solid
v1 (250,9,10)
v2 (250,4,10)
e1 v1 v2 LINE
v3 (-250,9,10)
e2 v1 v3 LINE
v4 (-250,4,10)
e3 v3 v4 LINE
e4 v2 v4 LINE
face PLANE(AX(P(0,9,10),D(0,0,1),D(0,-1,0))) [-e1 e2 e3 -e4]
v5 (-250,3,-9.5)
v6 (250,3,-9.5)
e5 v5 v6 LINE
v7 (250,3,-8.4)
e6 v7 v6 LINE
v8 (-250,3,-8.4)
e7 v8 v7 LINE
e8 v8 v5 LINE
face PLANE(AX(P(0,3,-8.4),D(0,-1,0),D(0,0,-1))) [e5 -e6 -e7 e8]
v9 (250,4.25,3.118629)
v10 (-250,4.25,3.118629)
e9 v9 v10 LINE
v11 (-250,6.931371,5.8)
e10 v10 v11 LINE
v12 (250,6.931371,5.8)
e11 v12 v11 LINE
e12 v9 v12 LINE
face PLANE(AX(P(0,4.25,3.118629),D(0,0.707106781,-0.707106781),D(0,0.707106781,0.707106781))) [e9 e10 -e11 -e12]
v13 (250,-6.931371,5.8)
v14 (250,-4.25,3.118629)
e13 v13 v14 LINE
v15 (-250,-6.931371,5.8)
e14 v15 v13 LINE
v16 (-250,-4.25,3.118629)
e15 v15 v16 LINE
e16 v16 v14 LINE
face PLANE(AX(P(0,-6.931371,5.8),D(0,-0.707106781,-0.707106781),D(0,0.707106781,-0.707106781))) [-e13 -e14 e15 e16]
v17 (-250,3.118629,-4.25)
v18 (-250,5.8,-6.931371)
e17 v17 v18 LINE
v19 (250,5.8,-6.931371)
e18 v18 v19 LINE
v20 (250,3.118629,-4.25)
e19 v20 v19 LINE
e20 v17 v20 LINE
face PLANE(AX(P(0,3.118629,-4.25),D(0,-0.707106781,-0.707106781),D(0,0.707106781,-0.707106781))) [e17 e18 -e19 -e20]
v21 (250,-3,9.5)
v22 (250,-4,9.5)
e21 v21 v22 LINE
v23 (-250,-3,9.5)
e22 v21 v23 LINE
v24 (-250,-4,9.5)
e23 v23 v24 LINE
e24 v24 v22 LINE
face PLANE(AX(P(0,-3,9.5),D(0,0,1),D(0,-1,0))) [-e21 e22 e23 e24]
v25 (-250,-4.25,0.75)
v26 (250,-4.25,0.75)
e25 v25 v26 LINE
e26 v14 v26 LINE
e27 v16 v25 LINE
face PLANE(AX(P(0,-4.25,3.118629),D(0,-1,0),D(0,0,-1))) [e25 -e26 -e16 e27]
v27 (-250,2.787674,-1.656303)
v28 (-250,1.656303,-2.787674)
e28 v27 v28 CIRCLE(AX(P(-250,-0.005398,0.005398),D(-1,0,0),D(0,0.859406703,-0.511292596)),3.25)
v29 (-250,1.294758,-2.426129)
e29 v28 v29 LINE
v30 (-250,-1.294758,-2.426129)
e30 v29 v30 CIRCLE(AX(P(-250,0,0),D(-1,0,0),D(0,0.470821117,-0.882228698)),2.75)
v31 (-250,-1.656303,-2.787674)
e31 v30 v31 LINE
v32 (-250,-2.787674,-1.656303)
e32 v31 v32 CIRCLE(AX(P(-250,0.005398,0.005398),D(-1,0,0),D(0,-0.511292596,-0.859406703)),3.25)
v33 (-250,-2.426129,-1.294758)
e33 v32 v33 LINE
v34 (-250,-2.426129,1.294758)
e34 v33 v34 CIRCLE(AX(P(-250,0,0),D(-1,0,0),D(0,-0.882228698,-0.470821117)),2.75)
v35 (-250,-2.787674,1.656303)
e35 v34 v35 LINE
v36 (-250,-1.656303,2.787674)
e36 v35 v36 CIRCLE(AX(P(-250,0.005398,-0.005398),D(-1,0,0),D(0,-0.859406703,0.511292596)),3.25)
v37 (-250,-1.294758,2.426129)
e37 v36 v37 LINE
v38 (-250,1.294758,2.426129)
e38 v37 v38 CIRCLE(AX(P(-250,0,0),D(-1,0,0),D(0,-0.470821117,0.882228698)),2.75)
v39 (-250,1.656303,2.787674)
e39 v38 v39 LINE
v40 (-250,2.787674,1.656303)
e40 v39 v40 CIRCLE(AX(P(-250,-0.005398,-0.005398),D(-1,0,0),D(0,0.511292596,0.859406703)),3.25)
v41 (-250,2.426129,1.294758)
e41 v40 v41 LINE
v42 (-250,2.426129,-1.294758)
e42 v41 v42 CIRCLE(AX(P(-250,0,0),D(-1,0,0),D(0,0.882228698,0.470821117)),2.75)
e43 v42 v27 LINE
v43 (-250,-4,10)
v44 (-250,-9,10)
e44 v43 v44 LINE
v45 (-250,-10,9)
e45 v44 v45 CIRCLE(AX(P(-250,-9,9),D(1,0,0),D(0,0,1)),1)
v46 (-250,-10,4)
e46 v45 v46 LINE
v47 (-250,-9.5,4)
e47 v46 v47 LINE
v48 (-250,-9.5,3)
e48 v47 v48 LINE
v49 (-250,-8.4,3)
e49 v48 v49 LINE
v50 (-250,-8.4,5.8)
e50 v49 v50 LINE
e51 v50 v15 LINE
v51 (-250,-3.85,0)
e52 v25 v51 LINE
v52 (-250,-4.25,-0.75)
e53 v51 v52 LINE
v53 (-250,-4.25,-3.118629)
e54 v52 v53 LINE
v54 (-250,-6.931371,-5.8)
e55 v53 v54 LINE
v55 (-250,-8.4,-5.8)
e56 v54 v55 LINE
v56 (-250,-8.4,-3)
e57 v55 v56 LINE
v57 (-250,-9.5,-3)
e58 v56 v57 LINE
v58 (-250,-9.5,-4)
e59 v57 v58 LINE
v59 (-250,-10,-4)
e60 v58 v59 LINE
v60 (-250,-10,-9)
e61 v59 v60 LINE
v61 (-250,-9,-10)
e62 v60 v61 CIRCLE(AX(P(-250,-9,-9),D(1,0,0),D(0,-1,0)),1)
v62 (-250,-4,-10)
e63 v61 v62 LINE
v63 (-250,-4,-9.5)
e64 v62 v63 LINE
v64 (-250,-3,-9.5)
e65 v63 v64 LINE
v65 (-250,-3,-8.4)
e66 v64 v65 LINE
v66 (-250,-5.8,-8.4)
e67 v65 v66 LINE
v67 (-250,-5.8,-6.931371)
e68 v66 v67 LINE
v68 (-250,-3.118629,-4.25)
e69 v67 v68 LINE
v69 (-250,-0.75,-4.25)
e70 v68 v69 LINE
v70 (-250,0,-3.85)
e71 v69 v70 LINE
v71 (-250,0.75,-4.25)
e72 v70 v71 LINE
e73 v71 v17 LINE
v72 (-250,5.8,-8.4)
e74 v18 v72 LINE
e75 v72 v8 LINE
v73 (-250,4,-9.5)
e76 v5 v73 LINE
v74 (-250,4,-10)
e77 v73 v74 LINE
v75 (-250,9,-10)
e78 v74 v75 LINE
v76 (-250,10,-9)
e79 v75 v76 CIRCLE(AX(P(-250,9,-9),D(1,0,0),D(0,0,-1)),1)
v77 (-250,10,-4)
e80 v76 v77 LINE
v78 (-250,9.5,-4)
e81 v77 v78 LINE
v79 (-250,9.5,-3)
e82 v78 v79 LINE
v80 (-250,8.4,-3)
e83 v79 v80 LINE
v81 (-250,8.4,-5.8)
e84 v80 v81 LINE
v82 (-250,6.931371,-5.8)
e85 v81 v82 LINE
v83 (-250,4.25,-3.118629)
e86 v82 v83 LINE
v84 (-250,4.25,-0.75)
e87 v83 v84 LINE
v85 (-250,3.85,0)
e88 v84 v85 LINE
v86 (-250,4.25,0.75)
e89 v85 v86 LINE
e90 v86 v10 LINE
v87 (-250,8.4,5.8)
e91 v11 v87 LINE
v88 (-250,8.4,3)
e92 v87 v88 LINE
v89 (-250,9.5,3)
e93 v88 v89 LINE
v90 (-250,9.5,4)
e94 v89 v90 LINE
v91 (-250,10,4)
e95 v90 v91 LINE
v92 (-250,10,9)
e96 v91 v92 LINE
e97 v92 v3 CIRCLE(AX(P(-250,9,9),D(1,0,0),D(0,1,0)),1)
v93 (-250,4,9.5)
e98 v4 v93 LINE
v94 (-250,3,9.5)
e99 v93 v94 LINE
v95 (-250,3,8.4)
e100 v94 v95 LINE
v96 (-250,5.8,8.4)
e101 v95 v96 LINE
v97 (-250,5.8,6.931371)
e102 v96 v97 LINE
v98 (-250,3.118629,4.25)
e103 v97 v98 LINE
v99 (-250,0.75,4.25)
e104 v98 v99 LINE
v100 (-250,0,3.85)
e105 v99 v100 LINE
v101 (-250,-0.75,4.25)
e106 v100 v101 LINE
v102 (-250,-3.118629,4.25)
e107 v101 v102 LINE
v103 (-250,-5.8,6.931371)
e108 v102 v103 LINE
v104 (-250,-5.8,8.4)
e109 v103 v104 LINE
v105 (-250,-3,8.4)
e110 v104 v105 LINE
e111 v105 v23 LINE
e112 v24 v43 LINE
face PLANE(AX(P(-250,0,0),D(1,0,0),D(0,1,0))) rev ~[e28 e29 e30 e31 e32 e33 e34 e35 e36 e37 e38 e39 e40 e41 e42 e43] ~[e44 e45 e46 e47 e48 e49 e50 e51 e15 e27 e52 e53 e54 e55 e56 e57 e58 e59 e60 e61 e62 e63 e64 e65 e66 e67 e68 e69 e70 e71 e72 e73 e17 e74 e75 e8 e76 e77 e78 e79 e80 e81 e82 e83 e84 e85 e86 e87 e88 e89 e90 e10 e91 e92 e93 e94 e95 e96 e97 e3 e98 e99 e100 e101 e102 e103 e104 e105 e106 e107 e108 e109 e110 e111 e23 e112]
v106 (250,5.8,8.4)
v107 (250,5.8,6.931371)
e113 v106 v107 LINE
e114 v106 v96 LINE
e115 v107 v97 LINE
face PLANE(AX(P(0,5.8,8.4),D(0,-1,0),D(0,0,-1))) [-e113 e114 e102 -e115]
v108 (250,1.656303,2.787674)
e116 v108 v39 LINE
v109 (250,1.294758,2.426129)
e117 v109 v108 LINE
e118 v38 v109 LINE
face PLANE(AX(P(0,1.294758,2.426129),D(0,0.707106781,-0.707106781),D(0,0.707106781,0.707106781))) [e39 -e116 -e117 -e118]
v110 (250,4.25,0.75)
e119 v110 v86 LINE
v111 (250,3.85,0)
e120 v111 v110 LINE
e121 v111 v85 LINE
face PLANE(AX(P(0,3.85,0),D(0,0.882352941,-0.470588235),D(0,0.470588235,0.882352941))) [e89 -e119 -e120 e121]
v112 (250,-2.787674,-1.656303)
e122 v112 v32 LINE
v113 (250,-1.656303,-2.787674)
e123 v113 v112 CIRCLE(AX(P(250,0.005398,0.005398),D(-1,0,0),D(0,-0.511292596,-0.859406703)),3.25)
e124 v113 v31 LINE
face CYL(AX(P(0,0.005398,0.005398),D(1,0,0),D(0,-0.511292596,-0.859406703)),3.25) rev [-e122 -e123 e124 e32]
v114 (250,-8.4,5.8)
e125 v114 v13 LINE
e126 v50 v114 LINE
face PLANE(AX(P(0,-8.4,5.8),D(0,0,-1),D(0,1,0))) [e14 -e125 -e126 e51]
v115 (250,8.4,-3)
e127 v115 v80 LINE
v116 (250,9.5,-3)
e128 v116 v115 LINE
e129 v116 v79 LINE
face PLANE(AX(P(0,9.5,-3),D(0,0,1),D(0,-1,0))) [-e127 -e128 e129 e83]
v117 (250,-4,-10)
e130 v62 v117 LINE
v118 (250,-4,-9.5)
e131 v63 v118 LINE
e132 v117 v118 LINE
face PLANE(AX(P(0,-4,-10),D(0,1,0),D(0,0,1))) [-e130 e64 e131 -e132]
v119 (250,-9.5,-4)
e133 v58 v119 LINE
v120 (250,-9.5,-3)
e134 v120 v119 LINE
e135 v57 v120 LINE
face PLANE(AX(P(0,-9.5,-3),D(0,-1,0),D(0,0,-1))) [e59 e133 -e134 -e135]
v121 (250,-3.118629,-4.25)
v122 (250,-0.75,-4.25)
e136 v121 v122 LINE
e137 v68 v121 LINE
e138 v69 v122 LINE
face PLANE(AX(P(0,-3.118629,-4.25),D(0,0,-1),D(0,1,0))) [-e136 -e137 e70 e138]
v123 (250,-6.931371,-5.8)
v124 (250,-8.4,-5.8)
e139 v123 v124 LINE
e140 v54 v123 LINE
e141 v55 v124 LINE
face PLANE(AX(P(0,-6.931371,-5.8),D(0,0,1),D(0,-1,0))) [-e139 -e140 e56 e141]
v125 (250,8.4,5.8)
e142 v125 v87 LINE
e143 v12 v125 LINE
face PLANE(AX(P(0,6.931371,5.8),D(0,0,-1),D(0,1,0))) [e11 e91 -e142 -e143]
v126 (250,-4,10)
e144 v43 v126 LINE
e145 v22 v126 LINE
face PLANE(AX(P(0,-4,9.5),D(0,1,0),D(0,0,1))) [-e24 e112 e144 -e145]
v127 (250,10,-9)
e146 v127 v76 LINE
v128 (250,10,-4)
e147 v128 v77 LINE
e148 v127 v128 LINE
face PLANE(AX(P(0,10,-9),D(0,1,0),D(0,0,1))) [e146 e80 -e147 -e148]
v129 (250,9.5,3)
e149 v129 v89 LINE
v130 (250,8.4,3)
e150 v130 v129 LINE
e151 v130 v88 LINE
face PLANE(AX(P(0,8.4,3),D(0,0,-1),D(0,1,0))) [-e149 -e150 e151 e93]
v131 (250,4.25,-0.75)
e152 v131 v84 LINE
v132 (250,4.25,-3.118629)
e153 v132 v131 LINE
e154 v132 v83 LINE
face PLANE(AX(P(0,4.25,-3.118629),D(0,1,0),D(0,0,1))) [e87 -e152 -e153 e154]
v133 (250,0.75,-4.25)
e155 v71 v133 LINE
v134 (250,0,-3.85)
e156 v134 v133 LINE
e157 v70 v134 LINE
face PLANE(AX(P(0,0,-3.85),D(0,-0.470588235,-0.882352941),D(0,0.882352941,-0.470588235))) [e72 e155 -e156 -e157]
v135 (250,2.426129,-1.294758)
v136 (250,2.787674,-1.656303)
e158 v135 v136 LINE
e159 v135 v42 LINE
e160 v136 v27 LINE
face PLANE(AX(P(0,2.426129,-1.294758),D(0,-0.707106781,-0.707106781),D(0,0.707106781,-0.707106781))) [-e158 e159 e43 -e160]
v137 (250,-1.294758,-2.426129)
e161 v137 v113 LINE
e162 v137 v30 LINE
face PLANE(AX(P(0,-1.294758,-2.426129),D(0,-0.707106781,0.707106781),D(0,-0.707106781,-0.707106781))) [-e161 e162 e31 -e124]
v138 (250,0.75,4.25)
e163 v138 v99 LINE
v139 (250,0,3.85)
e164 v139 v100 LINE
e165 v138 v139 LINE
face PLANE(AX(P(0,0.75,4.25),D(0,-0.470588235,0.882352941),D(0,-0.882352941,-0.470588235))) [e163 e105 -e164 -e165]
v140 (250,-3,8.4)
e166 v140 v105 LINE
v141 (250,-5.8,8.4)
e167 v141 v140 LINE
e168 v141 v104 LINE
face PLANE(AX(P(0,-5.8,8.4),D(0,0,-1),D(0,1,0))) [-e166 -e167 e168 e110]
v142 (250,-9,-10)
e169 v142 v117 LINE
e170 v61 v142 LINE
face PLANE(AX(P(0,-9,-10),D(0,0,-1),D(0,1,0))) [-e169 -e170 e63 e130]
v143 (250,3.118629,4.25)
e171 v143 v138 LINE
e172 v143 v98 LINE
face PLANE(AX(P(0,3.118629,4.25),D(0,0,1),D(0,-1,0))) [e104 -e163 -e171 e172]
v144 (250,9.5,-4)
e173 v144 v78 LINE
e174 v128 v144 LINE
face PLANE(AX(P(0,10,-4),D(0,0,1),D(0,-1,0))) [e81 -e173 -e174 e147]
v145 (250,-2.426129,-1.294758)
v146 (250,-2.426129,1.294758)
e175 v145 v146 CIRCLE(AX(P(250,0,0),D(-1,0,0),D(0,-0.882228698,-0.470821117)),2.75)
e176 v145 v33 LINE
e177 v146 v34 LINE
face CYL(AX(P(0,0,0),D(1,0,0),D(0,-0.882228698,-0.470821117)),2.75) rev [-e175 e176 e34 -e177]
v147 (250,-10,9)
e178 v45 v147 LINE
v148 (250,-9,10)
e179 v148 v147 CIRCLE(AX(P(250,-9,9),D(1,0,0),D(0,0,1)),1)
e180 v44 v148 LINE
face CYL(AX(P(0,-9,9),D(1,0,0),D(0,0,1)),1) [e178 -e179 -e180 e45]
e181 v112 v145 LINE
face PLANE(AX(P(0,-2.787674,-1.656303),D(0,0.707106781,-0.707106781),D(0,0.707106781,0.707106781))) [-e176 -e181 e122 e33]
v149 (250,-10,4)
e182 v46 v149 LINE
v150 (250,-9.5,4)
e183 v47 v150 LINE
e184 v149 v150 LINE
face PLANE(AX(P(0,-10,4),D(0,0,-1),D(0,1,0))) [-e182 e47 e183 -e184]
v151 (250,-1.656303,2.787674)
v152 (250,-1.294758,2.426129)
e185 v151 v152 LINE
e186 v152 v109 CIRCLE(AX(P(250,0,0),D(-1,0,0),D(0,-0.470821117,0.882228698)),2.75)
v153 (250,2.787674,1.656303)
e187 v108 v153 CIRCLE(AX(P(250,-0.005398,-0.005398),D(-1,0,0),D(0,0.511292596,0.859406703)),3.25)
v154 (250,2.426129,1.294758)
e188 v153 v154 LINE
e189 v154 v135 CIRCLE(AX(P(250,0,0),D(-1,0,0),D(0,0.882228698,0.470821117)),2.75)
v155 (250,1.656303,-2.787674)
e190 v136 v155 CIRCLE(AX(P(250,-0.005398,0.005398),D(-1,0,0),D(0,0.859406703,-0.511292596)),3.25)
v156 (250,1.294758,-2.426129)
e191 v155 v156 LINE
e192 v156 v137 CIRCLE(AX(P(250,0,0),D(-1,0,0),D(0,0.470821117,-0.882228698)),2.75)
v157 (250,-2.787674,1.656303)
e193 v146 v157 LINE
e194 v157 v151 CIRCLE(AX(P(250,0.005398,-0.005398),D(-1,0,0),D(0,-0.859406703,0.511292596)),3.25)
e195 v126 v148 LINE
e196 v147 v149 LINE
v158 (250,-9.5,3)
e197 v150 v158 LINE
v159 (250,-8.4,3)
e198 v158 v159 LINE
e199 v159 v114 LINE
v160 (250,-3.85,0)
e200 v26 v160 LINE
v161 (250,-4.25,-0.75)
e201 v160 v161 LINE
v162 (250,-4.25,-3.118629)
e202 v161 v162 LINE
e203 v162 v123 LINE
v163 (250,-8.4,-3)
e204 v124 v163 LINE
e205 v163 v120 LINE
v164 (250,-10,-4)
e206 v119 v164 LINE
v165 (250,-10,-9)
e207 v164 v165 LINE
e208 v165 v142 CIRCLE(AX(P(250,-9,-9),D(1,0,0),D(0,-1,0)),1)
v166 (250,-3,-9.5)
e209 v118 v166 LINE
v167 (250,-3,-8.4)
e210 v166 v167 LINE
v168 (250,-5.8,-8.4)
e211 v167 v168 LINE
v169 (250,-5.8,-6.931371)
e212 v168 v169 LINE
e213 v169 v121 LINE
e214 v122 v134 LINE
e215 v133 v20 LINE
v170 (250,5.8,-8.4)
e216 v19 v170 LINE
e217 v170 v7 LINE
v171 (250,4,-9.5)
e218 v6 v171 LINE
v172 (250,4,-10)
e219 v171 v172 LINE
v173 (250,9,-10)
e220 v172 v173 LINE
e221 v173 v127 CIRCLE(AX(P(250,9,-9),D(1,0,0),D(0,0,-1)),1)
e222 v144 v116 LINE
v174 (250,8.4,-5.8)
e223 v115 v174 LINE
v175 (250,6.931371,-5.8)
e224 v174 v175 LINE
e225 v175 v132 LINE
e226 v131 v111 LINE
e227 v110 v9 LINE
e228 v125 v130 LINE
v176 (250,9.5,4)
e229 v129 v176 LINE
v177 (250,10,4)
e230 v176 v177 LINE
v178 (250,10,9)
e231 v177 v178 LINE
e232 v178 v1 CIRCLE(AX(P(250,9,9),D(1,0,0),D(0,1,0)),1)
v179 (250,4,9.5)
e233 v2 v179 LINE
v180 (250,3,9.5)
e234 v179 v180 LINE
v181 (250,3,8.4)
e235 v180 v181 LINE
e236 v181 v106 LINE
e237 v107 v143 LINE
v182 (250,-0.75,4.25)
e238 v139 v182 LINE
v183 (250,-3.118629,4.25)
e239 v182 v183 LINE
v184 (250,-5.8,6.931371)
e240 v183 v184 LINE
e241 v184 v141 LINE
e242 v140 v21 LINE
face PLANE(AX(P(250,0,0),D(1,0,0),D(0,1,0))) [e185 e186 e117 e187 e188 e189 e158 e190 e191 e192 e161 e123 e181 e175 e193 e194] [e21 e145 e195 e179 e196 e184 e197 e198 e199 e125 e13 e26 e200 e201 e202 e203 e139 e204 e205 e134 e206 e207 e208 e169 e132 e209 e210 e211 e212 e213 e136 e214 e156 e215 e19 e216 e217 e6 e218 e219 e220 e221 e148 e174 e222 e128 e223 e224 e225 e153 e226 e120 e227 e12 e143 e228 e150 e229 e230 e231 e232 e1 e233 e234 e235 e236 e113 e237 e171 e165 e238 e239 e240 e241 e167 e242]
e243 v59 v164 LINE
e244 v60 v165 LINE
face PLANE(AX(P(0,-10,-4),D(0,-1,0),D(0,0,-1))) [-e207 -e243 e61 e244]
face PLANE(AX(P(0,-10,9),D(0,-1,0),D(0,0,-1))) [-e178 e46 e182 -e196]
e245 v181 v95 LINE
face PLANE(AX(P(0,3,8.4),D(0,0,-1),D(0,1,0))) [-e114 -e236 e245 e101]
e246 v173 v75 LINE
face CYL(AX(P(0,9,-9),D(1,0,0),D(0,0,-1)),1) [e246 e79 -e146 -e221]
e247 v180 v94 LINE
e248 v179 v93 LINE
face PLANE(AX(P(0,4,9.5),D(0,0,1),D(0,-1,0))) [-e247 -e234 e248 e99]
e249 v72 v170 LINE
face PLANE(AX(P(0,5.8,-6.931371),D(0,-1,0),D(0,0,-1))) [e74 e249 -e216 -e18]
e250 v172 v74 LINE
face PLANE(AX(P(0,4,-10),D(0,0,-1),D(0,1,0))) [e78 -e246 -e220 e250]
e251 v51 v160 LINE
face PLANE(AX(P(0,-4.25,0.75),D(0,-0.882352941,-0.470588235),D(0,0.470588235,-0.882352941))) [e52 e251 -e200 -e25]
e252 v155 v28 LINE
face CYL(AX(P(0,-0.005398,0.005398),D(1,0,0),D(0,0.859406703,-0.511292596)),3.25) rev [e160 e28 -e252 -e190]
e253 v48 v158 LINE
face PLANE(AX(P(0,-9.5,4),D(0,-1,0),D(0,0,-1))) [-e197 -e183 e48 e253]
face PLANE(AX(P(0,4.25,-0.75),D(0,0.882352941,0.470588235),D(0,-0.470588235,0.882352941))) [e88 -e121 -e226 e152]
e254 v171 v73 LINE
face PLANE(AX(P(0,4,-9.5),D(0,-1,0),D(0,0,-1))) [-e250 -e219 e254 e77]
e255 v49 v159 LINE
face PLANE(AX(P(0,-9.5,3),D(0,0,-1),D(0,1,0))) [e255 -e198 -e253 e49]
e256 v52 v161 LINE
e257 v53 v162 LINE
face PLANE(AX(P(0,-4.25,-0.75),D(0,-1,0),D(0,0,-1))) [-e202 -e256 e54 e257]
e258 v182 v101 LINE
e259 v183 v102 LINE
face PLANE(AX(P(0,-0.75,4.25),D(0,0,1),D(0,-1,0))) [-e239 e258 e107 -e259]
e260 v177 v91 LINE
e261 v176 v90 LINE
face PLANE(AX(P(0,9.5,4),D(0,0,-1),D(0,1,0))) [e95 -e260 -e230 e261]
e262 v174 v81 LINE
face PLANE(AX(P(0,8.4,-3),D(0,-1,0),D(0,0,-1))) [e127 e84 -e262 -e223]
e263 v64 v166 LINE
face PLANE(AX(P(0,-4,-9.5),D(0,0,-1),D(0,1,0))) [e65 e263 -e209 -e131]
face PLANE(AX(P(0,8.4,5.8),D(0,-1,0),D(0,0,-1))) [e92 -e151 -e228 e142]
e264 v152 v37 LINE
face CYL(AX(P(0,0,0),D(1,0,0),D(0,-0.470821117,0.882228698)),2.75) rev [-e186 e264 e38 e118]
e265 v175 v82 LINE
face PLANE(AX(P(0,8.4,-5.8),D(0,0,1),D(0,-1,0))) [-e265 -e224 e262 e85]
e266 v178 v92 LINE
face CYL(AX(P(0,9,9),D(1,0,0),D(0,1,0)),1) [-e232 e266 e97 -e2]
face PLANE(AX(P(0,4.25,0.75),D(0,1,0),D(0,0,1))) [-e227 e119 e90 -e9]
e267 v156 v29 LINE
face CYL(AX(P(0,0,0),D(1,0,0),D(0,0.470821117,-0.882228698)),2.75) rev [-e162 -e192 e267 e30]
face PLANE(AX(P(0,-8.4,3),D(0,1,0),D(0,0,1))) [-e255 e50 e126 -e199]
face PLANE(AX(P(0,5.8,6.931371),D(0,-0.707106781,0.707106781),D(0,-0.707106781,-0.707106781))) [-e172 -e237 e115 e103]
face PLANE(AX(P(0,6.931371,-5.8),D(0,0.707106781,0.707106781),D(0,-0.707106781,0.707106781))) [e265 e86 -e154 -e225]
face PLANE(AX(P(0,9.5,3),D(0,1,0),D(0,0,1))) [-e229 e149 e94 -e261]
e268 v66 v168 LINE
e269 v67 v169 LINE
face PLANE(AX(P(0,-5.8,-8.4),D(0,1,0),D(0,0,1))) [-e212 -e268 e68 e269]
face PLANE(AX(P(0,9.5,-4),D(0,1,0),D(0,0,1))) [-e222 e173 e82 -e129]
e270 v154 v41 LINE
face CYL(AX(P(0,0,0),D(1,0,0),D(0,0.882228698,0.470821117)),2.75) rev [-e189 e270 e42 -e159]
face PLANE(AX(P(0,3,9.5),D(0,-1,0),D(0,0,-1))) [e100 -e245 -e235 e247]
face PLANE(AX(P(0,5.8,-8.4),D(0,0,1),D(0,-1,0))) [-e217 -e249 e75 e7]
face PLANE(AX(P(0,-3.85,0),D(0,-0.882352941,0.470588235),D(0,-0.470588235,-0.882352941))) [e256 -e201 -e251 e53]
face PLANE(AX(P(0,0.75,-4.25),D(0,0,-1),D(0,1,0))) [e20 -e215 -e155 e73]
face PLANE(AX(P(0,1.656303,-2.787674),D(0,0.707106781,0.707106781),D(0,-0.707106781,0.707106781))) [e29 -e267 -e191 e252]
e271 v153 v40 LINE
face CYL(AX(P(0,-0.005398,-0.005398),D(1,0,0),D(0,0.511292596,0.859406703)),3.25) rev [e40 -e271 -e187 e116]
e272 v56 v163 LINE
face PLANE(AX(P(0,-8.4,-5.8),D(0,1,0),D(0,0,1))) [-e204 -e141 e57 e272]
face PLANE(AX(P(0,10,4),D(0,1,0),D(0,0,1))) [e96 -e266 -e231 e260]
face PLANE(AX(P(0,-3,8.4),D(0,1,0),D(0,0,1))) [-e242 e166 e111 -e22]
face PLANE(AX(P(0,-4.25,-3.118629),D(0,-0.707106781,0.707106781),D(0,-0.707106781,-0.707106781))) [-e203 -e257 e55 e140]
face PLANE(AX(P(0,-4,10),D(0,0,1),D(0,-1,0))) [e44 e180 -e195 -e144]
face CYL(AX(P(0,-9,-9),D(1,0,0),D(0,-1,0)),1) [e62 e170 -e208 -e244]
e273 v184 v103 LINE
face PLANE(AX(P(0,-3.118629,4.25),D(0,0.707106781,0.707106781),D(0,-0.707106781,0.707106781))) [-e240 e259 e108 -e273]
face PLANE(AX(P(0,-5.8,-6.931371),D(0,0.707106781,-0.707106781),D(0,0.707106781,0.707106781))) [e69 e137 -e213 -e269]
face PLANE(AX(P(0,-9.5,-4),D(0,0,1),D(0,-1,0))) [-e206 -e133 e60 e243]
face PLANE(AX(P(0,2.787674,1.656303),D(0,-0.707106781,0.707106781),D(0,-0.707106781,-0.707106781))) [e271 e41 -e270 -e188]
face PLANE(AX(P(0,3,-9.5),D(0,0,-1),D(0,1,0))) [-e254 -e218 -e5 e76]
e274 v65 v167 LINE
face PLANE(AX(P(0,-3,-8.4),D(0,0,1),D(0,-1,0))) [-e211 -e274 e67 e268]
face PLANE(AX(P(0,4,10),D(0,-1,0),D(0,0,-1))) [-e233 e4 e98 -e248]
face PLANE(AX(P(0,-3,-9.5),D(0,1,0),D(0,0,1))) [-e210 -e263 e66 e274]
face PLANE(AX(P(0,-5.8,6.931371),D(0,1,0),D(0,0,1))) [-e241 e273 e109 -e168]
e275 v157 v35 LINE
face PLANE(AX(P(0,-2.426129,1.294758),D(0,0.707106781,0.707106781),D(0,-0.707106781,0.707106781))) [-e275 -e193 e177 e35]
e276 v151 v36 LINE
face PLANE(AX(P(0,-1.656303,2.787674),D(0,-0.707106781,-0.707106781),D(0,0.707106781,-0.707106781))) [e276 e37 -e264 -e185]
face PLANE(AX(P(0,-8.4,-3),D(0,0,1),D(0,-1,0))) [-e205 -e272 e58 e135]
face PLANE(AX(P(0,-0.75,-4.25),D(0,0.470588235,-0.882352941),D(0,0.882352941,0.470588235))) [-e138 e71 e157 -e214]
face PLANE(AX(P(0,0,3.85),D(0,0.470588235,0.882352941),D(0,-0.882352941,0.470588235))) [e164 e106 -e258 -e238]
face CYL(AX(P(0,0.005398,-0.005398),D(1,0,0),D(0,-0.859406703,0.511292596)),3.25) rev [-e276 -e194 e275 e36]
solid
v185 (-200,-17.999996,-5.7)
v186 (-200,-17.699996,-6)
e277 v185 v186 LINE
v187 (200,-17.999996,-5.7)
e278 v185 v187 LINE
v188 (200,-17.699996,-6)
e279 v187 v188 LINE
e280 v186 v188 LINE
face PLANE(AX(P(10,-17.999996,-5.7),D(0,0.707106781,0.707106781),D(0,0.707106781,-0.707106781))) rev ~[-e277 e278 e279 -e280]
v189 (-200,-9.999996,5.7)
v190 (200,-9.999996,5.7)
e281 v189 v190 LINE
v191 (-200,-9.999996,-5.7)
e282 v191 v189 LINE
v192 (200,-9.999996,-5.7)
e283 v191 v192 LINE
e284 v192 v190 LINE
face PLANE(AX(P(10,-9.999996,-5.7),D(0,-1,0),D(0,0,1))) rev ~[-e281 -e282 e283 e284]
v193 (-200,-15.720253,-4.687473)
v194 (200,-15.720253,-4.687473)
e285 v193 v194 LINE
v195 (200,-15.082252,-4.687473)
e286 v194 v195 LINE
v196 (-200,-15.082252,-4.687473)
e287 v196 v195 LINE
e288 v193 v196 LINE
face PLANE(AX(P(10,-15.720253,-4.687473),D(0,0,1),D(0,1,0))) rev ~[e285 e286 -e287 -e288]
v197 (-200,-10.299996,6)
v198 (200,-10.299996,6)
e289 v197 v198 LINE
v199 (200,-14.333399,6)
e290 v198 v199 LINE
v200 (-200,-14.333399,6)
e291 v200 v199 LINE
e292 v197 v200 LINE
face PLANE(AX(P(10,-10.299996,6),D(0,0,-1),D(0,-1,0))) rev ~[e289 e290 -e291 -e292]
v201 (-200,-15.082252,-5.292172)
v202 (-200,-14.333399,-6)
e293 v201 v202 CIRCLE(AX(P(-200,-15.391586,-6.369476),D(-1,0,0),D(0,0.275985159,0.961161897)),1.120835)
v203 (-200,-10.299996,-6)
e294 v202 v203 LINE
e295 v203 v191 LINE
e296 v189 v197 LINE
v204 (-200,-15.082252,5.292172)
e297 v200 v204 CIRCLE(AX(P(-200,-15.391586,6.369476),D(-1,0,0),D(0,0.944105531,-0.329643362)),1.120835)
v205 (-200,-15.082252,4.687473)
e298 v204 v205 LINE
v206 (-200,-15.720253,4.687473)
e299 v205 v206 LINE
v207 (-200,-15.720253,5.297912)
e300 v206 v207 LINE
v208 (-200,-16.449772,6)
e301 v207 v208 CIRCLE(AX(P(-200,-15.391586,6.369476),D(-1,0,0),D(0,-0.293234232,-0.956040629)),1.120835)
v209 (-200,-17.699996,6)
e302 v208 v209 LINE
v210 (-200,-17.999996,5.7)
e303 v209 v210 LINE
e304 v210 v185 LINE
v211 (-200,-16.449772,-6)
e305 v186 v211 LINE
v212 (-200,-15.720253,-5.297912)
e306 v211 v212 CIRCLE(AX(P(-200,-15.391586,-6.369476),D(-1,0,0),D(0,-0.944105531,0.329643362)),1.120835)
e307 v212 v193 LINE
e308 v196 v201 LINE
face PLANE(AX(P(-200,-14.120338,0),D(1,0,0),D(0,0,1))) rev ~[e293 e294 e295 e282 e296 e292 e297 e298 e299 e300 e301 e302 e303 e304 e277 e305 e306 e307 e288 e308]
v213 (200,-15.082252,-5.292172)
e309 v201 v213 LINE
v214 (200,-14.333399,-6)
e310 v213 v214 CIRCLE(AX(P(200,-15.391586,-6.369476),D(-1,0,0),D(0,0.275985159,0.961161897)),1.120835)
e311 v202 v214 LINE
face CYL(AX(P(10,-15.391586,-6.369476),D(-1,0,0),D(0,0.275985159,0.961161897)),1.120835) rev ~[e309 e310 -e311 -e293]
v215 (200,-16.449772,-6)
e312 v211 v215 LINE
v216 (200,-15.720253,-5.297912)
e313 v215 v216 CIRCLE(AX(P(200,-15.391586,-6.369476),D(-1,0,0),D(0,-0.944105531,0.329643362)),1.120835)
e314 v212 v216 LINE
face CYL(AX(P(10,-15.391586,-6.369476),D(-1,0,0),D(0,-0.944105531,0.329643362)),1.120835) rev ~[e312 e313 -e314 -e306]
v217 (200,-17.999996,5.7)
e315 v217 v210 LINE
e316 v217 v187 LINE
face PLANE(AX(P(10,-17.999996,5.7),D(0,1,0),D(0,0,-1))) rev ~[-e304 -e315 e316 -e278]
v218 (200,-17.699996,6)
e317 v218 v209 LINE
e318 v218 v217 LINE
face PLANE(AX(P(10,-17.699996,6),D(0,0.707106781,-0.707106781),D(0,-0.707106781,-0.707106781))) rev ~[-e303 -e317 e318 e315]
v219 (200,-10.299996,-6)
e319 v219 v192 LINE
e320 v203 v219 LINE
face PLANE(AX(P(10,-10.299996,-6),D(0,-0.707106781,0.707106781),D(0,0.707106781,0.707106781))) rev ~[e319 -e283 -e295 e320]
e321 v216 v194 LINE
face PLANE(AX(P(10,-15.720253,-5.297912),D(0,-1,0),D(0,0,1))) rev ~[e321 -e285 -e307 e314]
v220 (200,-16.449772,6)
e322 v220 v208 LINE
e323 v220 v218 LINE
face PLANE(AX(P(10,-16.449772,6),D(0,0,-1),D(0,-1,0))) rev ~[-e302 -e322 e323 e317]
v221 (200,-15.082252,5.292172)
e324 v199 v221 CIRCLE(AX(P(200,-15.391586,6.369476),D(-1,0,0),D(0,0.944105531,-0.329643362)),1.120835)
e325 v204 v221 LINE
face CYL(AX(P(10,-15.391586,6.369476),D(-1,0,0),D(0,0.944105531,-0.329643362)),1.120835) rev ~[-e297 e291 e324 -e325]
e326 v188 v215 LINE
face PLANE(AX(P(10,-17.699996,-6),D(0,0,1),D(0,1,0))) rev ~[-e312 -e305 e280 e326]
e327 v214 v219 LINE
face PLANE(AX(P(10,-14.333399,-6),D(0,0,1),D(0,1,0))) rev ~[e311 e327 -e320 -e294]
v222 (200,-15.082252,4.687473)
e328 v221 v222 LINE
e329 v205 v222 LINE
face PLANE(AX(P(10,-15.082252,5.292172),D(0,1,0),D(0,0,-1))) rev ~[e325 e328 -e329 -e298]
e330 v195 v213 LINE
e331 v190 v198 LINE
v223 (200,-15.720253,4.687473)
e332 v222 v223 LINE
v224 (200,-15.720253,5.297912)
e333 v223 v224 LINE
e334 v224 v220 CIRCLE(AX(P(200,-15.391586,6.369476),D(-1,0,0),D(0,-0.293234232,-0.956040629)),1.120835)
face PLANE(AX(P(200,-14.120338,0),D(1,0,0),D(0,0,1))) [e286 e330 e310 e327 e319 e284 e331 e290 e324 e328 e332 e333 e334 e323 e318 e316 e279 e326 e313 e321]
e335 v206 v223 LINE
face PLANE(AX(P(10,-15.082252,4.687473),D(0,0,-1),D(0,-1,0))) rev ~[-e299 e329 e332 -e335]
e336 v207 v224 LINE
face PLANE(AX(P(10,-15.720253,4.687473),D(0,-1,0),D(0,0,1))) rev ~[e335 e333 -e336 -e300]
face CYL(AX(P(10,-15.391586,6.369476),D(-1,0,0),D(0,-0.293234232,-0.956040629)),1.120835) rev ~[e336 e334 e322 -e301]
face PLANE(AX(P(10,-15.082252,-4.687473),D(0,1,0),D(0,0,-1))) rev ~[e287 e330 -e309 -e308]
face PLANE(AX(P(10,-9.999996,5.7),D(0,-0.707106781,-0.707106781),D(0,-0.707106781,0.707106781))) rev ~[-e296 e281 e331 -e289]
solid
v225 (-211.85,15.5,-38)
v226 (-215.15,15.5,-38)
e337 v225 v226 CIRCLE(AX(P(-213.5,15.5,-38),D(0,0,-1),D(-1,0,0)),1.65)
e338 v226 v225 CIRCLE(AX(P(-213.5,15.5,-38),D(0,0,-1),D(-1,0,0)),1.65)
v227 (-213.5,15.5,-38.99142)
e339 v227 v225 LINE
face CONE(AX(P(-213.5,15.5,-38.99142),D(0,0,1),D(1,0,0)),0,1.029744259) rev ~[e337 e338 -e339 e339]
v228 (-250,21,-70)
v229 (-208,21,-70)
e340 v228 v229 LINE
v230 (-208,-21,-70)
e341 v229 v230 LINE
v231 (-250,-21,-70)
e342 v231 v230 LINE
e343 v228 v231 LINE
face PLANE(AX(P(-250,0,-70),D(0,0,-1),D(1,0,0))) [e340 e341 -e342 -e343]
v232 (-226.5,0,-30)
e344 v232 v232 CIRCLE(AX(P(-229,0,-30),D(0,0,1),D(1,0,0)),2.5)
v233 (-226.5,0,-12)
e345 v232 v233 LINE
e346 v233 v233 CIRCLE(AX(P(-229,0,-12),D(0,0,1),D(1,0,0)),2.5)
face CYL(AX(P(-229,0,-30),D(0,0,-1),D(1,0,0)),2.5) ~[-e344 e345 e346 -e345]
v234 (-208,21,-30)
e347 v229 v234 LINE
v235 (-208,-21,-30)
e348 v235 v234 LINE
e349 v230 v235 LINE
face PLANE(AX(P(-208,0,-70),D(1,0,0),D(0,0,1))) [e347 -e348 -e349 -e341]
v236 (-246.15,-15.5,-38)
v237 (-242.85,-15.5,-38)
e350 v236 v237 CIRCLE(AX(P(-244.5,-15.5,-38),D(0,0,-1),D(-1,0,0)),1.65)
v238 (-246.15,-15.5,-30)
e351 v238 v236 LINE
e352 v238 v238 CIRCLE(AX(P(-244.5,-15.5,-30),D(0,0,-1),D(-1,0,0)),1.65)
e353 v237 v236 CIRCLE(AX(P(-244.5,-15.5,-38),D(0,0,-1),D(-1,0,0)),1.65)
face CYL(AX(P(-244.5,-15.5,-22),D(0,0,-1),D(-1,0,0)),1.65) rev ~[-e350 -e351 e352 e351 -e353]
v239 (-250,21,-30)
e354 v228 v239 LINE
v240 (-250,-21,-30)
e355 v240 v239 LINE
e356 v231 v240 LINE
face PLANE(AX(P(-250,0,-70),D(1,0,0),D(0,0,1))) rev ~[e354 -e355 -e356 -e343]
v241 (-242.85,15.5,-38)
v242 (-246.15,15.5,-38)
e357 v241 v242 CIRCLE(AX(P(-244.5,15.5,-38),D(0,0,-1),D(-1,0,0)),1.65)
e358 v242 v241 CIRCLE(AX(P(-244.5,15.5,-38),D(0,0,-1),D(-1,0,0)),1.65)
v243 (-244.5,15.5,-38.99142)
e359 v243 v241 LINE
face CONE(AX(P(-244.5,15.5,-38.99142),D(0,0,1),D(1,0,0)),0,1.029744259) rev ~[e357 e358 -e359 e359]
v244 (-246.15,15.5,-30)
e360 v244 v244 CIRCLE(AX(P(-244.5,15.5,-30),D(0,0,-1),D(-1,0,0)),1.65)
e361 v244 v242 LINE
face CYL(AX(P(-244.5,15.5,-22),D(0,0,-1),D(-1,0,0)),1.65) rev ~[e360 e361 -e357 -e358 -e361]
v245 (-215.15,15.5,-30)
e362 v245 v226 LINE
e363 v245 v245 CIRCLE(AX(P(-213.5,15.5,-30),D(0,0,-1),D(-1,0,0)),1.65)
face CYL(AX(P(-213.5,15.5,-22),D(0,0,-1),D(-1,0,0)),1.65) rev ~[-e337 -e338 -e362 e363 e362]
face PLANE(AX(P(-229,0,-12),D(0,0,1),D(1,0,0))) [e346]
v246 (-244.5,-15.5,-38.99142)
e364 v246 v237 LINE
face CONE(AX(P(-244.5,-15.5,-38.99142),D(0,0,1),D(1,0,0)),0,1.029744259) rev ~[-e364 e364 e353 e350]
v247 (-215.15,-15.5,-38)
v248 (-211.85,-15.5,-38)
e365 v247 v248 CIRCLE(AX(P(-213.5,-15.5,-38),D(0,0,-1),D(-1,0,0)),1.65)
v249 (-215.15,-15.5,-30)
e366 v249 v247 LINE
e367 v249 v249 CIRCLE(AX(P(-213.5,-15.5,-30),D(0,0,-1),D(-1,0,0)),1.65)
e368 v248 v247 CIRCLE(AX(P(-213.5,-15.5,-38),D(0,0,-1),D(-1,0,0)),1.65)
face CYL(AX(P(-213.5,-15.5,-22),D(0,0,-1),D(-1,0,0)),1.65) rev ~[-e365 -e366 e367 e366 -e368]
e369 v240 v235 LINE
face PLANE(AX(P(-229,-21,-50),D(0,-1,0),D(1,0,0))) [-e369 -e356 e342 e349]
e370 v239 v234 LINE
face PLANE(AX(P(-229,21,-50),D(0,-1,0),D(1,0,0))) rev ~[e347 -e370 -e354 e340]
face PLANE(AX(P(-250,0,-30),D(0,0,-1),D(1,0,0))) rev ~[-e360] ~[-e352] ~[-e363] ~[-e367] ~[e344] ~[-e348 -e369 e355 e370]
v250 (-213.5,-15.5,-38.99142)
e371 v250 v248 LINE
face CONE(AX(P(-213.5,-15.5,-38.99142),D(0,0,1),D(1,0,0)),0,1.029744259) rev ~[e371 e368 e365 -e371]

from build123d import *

# Parameters (mm, degrees)
F1_DEPTH       = 250
F1_DEPTH_BACK  = 250
F3_DEPTH       = 10
F3_DEPTH_BACK  = 10
F5_ANGLE       = 90
F7_DEPTH       = 190
F8_DEPTH       = 190
F9_W           = 42
F9_H           = 40
F10_DEPTH      = 21
F10_DEPTH_BACK = 21
F11_R          = 2.5
F12_DEPTH      = 18
F13_D          = 3.3
F13_DEPTH      = 8
F13_TIP        = 0.9914200214


with BuildPart() as f1:
    # F0 (on Right) → F1 (new body, two sides)
    with BuildSketch(Plane.YZ) as f1_sk:
        with BuildLine():
            Line((-3, 9.5), (-4, 9.5))
            Line((-4, 9.5), (-4, 10))
            Line((-4, 10), (-9, 10))
            ThreePointArc((-9, 10), (-9.7071067812, 9.7071067812), (-10, 9))
            Line((-10, 9), (-10, 4))
            Line((-10, 4), (-9.5, 4))
            Line((-9.5, 4), (-9.5, 3))
            Line((-9.5, 3), (-8.4, 3))
            Line((-8.4, 3), (-8.4, 5.8))
            Line((-8.4, 5.8), (-6.9313708499, 5.8))
            Line((-6.9313708499, 5.8), (-4.25, 3.1186291501))
            Line((-4.25, 3.1186291501), (-4.25, 0.75))
            Line((-4.25, 0.75), (-3.85, 0))
            Line((-3.85, 0), (-4.25, -0.75))
            Line((-4.25, -0.75), (-4.25, -3.1186291501))
            Line((-4.25, -3.1186291501), (-6.9313708499, -5.8))
            Line((-6.9313708499, -5.8), (-8.4, -5.8))
            Line((-8.4, -5.8), (-8.4, -3))
            Line((-8.4, -3), (-9.5, -3))
            Line((-9.5, -3), (-9.5, -4))
            Line((-9.5, -4), (-10, -4))
            Line((-10, -4), (-10, -9))
            ThreePointArc((-10, -9), (-9.7071067812, -9.7071067812), (-9, -10))
            Line((-9, -10), (-4, -10))
            Line((-4, -10), (-4, -9.5))
            Line((-4, -9.5), (-3, -9.5))
            Line((-3, -9.5), (-3, -8.4))
            Line((-3, -8.4), (-5.8, -8.4))
            Line((-5.8, -8.4), (-5.8, -6.9313708499))
            Line((-5.8, -6.9313708499), (-3.1186291501, -4.25))
            Line((-3.1186291501, -4.25), (-0.75, -4.25))
            Line((-0.75, -4.25), (0, -3.85))
            Line((0, -3.85), (0.75, -4.25))
            Line((0.75, -4.25), (3.1186291501, -4.25))
            Line((3.1186291501, -4.25), (5.8, -6.9313708499))
            Line((5.8, -6.9313708499), (5.8, -8.4))
            Line((5.8, -8.4), (3, -8.4))
            Line((3, -8.4), (3, -9.5))
            Line((3, -9.5), (4, -9.5))
            Line((4, -9.5), (4, -10))
            Line((4, -10), (9, -10))
            ThreePointArc((9, -10), (9.7071067812, -9.7071067812), (10, -9))
            Line((10, -9), (10, -4))
            Line((10, -4), (9.5, -4))
            Line((9.5, -4), (9.5, -3))
            Line((9.5, -3), (8.4, -3))
            Line((8.4, -3), (8.4, -5.8))
            Line((8.4, -5.8), (6.9313708499, -5.8))
            Line((6.9313708499, -5.8), (4.25, -3.1186291501))
            Line((4.25, -3.1186291501), (4.25, -0.75))
            Line((4.25, -0.75), (3.85, 0))
            Line((3.85, 0), (4.25, 0.75))
            Line((4.25, 0.75), (4.25, 3.1186291501))
            Line((4.25, 3.1186291501), (6.9313708499, 5.8))
            Line((6.9313708499, 5.8), (8.4, 5.8))
            Line((8.4, 5.8), (8.4, 3))
            Line((8.4, 3), (9.5, 3))
            Line((9.5, 3), (9.5, 4))
            Line((9.5, 4), (10, 4))
            Line((10, 4), (10, 9))
            ThreePointArc((10, 9), (9.7071067812, 9.7071067812), (9, 10))
            Line((9, 10), (4, 10))
            Line((4, 10), (4, 9.5))
            Line((4, 9.5), (3, 9.5))
            Line((3, 9.5), (3, 8.4))
            Line((3, 8.4), (5.8, 8.4))
            Line((5.8, 8.4), (5.8, 6.9313708499))
            Line((5.8, 6.9313708499), (3.1186291501, 4.25))
            Line((3.1186291501, 4.25), (0.75, 4.25))
            Line((0.75, 4.25), (0, 3.85))
            Line((0, 3.85), (-0.75, 4.25))
            Line((-0.75, 4.25), (-3.1186291501, 4.25))
            Line((-3.1186291501, 4.25), (-5.8, 6.9313708499))
            Line((-5.8, 6.9313708499), (-5.8, 8.4))
            Line((-5.8, 8.4), (-3, 8.4))
            Line((-3, 8.4), (-3, 9.5))
        make_face()
        with BuildLine():
            Line((1.2947580706, 2.4261289205), (1.6563032137, 2.7876740636))
            ThreePointArc((1.6563032137, 2.7876740636), (2.2926993168, 2.2926993168), (2.7876740636, 1.6563032137))
            Line((2.7876740636, 1.6563032137), (2.4261289205, 1.2947580706))
            ThreePointArc((2.4261289205, 1.2947580706), (2.75, 0), (2.4261289205, -1.2947580706))
            Line((2.4261289205, -1.2947580706), (2.7876740636, -1.6563032137))
            ThreePointArc((2.7876740636, -1.6563032137), (2.2926993168, -2.2926993168), (1.6563032137, -2.7876740636))
            Line((1.6563032137, -2.7876740636), (1.2947580706, -2.4261289205))
            ThreePointArc((1.2947580706, -2.4261289205), (0, -2.75), (-1.2947580706, -2.4261289205))
            Line((-1.2947580706, -2.4261289205), (-1.6563032137, -2.7876740636))
            ThreePointArc((-1.6563032137, -2.7876740636), (-2.2926993168, -2.2926993168), (-2.7876740636, -1.6563032137))
            Line((-2.7876740636, -1.6563032137), (-2.4261289205, -1.2947580706))
            ThreePointArc((-2.4261289205, -1.2947580706), (-2.75, 0), (-2.4261289205, 1.2947580706))
            Line((-2.4261289205, 1.2947580706), (-2.7876740636, 1.6563032137))
            ThreePointArc((-2.7876740636, 1.6563032137), (-2.2926993168, 2.2926993168), (-1.6563032137, 2.7876740636))
            Line((-1.6563032137, 2.7876740636), (-1.2947580706, 2.4261289205))
            ThreePointArc((-1.2947580706, 2.4261289205), (0, 2.75), (1.2947580706, 2.4261289205))
        make_face(mode=Mode.SUBTRACT)
    extrude(amount=F1_DEPTH)
    extrude(f1_sk.sketch, amount=-F1_DEPTH_BACK)


with BuildPart() as f3:
    # F2 (on Right) → F3 (new body, two sides)
    with BuildSketch(Plane.YZ) as f3_sk:
        with BuildLine():
            Line((5.7, 3.1613363109), (-5.7, 3.1613363109))
            Line((-5.7, 3.1613363109), (-6, 2.8613363109))
            Line((-6, 2.8613363109), (-6, 1.6111123248))
            ThreePointArc((-6, 1.6111123248), (-5.5618877209, 1.3301468843), (-5.2979118939, 0.8815928622))
            Line((-5.2979118939, 0.8815928622), (-4.687472904, 0.8815928622))
            Line((-4.687472904, 0.8815928622), (-4.687472904, 0.2435917318))
            Line((-4.687472904, 0.2435917318), (-5.2921717973, 0.2435917318))
            ThreePointArc((-5.2921717973, 0.2435917318), (-5.5549280271, -0.2169986261), (-6, -0.5052610984))
            Line((-6, -0.5052610984), (-6, -4.5386636892))
            Line((-6, -4.5386636892), (-5.7, -4.8386636892))
            Line((-5.7, -4.8386636892), (5.7, -4.8386636892))
            Line((5.7, -4.8386636892), (6, -4.5386636892))
            Line((6, -4.5386636892), (6, -0.5052610984))
            ThreePointArc((6, -0.5052610984), (5.5549280271, -0.2169986261), (5.2921717973, 0.2435917318))
            Line((5.2921717973, 0.2435917318), (4.687472904, 0.2435917318))
            Line((4.687472904, 0.2435917318), (4.687472904, 0.8815928622))
            Line((4.687472904, 0.8815928622), (5.2979118939, 0.8815928622))
            ThreePointArc((5.2979118939, 0.8815928622), (5.5618877209, 1.3301468843), (6, 1.6111123248))
            Line((6, 1.6111123248), (6, 2.8613363109))
            Line((6, 2.8613363109), (5.7, 3.1613363109))
        make_face()
    extrude(amount=F3_DEPTH)
    extrude(f3_sk.sketch, amount=-F3_DEPTH_BACK)


with BuildPart() as f3_1:
    # F5: moved
    add(f3.part.rotate(Axis((16.7408511043, 0, 0), (1, 0, 0)), F5_ANGLE))


with BuildPart() as f3_2:
    # F6: moved
    add(f3_1.part.moved(Location((0, -14.83866, 0))))

    # F7 (add): a face of the model
    f7_faces = [f3_2.faces().sort_by_distance(p)[0] for p in [
        (-10, -13.954065481, 0),
    ]]
    extrude(f7_faces, amount=F7_DEPTH)

    # F8 (add): a face of the model
    f8_faces = [f3_2.faces().sort_by_distance(p)[0] for p in [
        (10, -13.954065481, 0),
    ]]
    extrude(f8_faces, amount=F8_DEPTH)


with BuildPart() as f10:
    # F9 (on Front) → F10 (new body, two sides)
    with BuildSketch(Plane.XZ) as f10_sk:
        with Locations((-229, -50)):
            Rectangle(F9_W, F9_H)
    extrude(amount=F10_DEPTH)
    extrude(f10_sk.sketch, amount=-F10_DEPTH_BACK)

    # F11 (on face) → F12 (join)
    with BuildSketch(Plane.XY.offset(-30)):
        with Locations((-229, 0)):
            Circle(F11_R)
    extrude(amount=F12_DEPTH)

    # F13
    with Locations(Plane.XY.offset(-30)):
        with Locations((-244.5, 15.5), (-244.5, -15.5), (-213.5, -15.5), (-213.5, 15.5)):
            Hole(F13_D / 2, depth=F13_DEPTH)
            with Locations((0, 0, -(F13_DEPTH + F13_TIP / 2))):  # 118° drill point
                Cone(0, F13_D / 2, F13_TIP, mode=Mode.SUBTRACT)


solid = Compound([f1.part, f3_2.part, f10.part])
